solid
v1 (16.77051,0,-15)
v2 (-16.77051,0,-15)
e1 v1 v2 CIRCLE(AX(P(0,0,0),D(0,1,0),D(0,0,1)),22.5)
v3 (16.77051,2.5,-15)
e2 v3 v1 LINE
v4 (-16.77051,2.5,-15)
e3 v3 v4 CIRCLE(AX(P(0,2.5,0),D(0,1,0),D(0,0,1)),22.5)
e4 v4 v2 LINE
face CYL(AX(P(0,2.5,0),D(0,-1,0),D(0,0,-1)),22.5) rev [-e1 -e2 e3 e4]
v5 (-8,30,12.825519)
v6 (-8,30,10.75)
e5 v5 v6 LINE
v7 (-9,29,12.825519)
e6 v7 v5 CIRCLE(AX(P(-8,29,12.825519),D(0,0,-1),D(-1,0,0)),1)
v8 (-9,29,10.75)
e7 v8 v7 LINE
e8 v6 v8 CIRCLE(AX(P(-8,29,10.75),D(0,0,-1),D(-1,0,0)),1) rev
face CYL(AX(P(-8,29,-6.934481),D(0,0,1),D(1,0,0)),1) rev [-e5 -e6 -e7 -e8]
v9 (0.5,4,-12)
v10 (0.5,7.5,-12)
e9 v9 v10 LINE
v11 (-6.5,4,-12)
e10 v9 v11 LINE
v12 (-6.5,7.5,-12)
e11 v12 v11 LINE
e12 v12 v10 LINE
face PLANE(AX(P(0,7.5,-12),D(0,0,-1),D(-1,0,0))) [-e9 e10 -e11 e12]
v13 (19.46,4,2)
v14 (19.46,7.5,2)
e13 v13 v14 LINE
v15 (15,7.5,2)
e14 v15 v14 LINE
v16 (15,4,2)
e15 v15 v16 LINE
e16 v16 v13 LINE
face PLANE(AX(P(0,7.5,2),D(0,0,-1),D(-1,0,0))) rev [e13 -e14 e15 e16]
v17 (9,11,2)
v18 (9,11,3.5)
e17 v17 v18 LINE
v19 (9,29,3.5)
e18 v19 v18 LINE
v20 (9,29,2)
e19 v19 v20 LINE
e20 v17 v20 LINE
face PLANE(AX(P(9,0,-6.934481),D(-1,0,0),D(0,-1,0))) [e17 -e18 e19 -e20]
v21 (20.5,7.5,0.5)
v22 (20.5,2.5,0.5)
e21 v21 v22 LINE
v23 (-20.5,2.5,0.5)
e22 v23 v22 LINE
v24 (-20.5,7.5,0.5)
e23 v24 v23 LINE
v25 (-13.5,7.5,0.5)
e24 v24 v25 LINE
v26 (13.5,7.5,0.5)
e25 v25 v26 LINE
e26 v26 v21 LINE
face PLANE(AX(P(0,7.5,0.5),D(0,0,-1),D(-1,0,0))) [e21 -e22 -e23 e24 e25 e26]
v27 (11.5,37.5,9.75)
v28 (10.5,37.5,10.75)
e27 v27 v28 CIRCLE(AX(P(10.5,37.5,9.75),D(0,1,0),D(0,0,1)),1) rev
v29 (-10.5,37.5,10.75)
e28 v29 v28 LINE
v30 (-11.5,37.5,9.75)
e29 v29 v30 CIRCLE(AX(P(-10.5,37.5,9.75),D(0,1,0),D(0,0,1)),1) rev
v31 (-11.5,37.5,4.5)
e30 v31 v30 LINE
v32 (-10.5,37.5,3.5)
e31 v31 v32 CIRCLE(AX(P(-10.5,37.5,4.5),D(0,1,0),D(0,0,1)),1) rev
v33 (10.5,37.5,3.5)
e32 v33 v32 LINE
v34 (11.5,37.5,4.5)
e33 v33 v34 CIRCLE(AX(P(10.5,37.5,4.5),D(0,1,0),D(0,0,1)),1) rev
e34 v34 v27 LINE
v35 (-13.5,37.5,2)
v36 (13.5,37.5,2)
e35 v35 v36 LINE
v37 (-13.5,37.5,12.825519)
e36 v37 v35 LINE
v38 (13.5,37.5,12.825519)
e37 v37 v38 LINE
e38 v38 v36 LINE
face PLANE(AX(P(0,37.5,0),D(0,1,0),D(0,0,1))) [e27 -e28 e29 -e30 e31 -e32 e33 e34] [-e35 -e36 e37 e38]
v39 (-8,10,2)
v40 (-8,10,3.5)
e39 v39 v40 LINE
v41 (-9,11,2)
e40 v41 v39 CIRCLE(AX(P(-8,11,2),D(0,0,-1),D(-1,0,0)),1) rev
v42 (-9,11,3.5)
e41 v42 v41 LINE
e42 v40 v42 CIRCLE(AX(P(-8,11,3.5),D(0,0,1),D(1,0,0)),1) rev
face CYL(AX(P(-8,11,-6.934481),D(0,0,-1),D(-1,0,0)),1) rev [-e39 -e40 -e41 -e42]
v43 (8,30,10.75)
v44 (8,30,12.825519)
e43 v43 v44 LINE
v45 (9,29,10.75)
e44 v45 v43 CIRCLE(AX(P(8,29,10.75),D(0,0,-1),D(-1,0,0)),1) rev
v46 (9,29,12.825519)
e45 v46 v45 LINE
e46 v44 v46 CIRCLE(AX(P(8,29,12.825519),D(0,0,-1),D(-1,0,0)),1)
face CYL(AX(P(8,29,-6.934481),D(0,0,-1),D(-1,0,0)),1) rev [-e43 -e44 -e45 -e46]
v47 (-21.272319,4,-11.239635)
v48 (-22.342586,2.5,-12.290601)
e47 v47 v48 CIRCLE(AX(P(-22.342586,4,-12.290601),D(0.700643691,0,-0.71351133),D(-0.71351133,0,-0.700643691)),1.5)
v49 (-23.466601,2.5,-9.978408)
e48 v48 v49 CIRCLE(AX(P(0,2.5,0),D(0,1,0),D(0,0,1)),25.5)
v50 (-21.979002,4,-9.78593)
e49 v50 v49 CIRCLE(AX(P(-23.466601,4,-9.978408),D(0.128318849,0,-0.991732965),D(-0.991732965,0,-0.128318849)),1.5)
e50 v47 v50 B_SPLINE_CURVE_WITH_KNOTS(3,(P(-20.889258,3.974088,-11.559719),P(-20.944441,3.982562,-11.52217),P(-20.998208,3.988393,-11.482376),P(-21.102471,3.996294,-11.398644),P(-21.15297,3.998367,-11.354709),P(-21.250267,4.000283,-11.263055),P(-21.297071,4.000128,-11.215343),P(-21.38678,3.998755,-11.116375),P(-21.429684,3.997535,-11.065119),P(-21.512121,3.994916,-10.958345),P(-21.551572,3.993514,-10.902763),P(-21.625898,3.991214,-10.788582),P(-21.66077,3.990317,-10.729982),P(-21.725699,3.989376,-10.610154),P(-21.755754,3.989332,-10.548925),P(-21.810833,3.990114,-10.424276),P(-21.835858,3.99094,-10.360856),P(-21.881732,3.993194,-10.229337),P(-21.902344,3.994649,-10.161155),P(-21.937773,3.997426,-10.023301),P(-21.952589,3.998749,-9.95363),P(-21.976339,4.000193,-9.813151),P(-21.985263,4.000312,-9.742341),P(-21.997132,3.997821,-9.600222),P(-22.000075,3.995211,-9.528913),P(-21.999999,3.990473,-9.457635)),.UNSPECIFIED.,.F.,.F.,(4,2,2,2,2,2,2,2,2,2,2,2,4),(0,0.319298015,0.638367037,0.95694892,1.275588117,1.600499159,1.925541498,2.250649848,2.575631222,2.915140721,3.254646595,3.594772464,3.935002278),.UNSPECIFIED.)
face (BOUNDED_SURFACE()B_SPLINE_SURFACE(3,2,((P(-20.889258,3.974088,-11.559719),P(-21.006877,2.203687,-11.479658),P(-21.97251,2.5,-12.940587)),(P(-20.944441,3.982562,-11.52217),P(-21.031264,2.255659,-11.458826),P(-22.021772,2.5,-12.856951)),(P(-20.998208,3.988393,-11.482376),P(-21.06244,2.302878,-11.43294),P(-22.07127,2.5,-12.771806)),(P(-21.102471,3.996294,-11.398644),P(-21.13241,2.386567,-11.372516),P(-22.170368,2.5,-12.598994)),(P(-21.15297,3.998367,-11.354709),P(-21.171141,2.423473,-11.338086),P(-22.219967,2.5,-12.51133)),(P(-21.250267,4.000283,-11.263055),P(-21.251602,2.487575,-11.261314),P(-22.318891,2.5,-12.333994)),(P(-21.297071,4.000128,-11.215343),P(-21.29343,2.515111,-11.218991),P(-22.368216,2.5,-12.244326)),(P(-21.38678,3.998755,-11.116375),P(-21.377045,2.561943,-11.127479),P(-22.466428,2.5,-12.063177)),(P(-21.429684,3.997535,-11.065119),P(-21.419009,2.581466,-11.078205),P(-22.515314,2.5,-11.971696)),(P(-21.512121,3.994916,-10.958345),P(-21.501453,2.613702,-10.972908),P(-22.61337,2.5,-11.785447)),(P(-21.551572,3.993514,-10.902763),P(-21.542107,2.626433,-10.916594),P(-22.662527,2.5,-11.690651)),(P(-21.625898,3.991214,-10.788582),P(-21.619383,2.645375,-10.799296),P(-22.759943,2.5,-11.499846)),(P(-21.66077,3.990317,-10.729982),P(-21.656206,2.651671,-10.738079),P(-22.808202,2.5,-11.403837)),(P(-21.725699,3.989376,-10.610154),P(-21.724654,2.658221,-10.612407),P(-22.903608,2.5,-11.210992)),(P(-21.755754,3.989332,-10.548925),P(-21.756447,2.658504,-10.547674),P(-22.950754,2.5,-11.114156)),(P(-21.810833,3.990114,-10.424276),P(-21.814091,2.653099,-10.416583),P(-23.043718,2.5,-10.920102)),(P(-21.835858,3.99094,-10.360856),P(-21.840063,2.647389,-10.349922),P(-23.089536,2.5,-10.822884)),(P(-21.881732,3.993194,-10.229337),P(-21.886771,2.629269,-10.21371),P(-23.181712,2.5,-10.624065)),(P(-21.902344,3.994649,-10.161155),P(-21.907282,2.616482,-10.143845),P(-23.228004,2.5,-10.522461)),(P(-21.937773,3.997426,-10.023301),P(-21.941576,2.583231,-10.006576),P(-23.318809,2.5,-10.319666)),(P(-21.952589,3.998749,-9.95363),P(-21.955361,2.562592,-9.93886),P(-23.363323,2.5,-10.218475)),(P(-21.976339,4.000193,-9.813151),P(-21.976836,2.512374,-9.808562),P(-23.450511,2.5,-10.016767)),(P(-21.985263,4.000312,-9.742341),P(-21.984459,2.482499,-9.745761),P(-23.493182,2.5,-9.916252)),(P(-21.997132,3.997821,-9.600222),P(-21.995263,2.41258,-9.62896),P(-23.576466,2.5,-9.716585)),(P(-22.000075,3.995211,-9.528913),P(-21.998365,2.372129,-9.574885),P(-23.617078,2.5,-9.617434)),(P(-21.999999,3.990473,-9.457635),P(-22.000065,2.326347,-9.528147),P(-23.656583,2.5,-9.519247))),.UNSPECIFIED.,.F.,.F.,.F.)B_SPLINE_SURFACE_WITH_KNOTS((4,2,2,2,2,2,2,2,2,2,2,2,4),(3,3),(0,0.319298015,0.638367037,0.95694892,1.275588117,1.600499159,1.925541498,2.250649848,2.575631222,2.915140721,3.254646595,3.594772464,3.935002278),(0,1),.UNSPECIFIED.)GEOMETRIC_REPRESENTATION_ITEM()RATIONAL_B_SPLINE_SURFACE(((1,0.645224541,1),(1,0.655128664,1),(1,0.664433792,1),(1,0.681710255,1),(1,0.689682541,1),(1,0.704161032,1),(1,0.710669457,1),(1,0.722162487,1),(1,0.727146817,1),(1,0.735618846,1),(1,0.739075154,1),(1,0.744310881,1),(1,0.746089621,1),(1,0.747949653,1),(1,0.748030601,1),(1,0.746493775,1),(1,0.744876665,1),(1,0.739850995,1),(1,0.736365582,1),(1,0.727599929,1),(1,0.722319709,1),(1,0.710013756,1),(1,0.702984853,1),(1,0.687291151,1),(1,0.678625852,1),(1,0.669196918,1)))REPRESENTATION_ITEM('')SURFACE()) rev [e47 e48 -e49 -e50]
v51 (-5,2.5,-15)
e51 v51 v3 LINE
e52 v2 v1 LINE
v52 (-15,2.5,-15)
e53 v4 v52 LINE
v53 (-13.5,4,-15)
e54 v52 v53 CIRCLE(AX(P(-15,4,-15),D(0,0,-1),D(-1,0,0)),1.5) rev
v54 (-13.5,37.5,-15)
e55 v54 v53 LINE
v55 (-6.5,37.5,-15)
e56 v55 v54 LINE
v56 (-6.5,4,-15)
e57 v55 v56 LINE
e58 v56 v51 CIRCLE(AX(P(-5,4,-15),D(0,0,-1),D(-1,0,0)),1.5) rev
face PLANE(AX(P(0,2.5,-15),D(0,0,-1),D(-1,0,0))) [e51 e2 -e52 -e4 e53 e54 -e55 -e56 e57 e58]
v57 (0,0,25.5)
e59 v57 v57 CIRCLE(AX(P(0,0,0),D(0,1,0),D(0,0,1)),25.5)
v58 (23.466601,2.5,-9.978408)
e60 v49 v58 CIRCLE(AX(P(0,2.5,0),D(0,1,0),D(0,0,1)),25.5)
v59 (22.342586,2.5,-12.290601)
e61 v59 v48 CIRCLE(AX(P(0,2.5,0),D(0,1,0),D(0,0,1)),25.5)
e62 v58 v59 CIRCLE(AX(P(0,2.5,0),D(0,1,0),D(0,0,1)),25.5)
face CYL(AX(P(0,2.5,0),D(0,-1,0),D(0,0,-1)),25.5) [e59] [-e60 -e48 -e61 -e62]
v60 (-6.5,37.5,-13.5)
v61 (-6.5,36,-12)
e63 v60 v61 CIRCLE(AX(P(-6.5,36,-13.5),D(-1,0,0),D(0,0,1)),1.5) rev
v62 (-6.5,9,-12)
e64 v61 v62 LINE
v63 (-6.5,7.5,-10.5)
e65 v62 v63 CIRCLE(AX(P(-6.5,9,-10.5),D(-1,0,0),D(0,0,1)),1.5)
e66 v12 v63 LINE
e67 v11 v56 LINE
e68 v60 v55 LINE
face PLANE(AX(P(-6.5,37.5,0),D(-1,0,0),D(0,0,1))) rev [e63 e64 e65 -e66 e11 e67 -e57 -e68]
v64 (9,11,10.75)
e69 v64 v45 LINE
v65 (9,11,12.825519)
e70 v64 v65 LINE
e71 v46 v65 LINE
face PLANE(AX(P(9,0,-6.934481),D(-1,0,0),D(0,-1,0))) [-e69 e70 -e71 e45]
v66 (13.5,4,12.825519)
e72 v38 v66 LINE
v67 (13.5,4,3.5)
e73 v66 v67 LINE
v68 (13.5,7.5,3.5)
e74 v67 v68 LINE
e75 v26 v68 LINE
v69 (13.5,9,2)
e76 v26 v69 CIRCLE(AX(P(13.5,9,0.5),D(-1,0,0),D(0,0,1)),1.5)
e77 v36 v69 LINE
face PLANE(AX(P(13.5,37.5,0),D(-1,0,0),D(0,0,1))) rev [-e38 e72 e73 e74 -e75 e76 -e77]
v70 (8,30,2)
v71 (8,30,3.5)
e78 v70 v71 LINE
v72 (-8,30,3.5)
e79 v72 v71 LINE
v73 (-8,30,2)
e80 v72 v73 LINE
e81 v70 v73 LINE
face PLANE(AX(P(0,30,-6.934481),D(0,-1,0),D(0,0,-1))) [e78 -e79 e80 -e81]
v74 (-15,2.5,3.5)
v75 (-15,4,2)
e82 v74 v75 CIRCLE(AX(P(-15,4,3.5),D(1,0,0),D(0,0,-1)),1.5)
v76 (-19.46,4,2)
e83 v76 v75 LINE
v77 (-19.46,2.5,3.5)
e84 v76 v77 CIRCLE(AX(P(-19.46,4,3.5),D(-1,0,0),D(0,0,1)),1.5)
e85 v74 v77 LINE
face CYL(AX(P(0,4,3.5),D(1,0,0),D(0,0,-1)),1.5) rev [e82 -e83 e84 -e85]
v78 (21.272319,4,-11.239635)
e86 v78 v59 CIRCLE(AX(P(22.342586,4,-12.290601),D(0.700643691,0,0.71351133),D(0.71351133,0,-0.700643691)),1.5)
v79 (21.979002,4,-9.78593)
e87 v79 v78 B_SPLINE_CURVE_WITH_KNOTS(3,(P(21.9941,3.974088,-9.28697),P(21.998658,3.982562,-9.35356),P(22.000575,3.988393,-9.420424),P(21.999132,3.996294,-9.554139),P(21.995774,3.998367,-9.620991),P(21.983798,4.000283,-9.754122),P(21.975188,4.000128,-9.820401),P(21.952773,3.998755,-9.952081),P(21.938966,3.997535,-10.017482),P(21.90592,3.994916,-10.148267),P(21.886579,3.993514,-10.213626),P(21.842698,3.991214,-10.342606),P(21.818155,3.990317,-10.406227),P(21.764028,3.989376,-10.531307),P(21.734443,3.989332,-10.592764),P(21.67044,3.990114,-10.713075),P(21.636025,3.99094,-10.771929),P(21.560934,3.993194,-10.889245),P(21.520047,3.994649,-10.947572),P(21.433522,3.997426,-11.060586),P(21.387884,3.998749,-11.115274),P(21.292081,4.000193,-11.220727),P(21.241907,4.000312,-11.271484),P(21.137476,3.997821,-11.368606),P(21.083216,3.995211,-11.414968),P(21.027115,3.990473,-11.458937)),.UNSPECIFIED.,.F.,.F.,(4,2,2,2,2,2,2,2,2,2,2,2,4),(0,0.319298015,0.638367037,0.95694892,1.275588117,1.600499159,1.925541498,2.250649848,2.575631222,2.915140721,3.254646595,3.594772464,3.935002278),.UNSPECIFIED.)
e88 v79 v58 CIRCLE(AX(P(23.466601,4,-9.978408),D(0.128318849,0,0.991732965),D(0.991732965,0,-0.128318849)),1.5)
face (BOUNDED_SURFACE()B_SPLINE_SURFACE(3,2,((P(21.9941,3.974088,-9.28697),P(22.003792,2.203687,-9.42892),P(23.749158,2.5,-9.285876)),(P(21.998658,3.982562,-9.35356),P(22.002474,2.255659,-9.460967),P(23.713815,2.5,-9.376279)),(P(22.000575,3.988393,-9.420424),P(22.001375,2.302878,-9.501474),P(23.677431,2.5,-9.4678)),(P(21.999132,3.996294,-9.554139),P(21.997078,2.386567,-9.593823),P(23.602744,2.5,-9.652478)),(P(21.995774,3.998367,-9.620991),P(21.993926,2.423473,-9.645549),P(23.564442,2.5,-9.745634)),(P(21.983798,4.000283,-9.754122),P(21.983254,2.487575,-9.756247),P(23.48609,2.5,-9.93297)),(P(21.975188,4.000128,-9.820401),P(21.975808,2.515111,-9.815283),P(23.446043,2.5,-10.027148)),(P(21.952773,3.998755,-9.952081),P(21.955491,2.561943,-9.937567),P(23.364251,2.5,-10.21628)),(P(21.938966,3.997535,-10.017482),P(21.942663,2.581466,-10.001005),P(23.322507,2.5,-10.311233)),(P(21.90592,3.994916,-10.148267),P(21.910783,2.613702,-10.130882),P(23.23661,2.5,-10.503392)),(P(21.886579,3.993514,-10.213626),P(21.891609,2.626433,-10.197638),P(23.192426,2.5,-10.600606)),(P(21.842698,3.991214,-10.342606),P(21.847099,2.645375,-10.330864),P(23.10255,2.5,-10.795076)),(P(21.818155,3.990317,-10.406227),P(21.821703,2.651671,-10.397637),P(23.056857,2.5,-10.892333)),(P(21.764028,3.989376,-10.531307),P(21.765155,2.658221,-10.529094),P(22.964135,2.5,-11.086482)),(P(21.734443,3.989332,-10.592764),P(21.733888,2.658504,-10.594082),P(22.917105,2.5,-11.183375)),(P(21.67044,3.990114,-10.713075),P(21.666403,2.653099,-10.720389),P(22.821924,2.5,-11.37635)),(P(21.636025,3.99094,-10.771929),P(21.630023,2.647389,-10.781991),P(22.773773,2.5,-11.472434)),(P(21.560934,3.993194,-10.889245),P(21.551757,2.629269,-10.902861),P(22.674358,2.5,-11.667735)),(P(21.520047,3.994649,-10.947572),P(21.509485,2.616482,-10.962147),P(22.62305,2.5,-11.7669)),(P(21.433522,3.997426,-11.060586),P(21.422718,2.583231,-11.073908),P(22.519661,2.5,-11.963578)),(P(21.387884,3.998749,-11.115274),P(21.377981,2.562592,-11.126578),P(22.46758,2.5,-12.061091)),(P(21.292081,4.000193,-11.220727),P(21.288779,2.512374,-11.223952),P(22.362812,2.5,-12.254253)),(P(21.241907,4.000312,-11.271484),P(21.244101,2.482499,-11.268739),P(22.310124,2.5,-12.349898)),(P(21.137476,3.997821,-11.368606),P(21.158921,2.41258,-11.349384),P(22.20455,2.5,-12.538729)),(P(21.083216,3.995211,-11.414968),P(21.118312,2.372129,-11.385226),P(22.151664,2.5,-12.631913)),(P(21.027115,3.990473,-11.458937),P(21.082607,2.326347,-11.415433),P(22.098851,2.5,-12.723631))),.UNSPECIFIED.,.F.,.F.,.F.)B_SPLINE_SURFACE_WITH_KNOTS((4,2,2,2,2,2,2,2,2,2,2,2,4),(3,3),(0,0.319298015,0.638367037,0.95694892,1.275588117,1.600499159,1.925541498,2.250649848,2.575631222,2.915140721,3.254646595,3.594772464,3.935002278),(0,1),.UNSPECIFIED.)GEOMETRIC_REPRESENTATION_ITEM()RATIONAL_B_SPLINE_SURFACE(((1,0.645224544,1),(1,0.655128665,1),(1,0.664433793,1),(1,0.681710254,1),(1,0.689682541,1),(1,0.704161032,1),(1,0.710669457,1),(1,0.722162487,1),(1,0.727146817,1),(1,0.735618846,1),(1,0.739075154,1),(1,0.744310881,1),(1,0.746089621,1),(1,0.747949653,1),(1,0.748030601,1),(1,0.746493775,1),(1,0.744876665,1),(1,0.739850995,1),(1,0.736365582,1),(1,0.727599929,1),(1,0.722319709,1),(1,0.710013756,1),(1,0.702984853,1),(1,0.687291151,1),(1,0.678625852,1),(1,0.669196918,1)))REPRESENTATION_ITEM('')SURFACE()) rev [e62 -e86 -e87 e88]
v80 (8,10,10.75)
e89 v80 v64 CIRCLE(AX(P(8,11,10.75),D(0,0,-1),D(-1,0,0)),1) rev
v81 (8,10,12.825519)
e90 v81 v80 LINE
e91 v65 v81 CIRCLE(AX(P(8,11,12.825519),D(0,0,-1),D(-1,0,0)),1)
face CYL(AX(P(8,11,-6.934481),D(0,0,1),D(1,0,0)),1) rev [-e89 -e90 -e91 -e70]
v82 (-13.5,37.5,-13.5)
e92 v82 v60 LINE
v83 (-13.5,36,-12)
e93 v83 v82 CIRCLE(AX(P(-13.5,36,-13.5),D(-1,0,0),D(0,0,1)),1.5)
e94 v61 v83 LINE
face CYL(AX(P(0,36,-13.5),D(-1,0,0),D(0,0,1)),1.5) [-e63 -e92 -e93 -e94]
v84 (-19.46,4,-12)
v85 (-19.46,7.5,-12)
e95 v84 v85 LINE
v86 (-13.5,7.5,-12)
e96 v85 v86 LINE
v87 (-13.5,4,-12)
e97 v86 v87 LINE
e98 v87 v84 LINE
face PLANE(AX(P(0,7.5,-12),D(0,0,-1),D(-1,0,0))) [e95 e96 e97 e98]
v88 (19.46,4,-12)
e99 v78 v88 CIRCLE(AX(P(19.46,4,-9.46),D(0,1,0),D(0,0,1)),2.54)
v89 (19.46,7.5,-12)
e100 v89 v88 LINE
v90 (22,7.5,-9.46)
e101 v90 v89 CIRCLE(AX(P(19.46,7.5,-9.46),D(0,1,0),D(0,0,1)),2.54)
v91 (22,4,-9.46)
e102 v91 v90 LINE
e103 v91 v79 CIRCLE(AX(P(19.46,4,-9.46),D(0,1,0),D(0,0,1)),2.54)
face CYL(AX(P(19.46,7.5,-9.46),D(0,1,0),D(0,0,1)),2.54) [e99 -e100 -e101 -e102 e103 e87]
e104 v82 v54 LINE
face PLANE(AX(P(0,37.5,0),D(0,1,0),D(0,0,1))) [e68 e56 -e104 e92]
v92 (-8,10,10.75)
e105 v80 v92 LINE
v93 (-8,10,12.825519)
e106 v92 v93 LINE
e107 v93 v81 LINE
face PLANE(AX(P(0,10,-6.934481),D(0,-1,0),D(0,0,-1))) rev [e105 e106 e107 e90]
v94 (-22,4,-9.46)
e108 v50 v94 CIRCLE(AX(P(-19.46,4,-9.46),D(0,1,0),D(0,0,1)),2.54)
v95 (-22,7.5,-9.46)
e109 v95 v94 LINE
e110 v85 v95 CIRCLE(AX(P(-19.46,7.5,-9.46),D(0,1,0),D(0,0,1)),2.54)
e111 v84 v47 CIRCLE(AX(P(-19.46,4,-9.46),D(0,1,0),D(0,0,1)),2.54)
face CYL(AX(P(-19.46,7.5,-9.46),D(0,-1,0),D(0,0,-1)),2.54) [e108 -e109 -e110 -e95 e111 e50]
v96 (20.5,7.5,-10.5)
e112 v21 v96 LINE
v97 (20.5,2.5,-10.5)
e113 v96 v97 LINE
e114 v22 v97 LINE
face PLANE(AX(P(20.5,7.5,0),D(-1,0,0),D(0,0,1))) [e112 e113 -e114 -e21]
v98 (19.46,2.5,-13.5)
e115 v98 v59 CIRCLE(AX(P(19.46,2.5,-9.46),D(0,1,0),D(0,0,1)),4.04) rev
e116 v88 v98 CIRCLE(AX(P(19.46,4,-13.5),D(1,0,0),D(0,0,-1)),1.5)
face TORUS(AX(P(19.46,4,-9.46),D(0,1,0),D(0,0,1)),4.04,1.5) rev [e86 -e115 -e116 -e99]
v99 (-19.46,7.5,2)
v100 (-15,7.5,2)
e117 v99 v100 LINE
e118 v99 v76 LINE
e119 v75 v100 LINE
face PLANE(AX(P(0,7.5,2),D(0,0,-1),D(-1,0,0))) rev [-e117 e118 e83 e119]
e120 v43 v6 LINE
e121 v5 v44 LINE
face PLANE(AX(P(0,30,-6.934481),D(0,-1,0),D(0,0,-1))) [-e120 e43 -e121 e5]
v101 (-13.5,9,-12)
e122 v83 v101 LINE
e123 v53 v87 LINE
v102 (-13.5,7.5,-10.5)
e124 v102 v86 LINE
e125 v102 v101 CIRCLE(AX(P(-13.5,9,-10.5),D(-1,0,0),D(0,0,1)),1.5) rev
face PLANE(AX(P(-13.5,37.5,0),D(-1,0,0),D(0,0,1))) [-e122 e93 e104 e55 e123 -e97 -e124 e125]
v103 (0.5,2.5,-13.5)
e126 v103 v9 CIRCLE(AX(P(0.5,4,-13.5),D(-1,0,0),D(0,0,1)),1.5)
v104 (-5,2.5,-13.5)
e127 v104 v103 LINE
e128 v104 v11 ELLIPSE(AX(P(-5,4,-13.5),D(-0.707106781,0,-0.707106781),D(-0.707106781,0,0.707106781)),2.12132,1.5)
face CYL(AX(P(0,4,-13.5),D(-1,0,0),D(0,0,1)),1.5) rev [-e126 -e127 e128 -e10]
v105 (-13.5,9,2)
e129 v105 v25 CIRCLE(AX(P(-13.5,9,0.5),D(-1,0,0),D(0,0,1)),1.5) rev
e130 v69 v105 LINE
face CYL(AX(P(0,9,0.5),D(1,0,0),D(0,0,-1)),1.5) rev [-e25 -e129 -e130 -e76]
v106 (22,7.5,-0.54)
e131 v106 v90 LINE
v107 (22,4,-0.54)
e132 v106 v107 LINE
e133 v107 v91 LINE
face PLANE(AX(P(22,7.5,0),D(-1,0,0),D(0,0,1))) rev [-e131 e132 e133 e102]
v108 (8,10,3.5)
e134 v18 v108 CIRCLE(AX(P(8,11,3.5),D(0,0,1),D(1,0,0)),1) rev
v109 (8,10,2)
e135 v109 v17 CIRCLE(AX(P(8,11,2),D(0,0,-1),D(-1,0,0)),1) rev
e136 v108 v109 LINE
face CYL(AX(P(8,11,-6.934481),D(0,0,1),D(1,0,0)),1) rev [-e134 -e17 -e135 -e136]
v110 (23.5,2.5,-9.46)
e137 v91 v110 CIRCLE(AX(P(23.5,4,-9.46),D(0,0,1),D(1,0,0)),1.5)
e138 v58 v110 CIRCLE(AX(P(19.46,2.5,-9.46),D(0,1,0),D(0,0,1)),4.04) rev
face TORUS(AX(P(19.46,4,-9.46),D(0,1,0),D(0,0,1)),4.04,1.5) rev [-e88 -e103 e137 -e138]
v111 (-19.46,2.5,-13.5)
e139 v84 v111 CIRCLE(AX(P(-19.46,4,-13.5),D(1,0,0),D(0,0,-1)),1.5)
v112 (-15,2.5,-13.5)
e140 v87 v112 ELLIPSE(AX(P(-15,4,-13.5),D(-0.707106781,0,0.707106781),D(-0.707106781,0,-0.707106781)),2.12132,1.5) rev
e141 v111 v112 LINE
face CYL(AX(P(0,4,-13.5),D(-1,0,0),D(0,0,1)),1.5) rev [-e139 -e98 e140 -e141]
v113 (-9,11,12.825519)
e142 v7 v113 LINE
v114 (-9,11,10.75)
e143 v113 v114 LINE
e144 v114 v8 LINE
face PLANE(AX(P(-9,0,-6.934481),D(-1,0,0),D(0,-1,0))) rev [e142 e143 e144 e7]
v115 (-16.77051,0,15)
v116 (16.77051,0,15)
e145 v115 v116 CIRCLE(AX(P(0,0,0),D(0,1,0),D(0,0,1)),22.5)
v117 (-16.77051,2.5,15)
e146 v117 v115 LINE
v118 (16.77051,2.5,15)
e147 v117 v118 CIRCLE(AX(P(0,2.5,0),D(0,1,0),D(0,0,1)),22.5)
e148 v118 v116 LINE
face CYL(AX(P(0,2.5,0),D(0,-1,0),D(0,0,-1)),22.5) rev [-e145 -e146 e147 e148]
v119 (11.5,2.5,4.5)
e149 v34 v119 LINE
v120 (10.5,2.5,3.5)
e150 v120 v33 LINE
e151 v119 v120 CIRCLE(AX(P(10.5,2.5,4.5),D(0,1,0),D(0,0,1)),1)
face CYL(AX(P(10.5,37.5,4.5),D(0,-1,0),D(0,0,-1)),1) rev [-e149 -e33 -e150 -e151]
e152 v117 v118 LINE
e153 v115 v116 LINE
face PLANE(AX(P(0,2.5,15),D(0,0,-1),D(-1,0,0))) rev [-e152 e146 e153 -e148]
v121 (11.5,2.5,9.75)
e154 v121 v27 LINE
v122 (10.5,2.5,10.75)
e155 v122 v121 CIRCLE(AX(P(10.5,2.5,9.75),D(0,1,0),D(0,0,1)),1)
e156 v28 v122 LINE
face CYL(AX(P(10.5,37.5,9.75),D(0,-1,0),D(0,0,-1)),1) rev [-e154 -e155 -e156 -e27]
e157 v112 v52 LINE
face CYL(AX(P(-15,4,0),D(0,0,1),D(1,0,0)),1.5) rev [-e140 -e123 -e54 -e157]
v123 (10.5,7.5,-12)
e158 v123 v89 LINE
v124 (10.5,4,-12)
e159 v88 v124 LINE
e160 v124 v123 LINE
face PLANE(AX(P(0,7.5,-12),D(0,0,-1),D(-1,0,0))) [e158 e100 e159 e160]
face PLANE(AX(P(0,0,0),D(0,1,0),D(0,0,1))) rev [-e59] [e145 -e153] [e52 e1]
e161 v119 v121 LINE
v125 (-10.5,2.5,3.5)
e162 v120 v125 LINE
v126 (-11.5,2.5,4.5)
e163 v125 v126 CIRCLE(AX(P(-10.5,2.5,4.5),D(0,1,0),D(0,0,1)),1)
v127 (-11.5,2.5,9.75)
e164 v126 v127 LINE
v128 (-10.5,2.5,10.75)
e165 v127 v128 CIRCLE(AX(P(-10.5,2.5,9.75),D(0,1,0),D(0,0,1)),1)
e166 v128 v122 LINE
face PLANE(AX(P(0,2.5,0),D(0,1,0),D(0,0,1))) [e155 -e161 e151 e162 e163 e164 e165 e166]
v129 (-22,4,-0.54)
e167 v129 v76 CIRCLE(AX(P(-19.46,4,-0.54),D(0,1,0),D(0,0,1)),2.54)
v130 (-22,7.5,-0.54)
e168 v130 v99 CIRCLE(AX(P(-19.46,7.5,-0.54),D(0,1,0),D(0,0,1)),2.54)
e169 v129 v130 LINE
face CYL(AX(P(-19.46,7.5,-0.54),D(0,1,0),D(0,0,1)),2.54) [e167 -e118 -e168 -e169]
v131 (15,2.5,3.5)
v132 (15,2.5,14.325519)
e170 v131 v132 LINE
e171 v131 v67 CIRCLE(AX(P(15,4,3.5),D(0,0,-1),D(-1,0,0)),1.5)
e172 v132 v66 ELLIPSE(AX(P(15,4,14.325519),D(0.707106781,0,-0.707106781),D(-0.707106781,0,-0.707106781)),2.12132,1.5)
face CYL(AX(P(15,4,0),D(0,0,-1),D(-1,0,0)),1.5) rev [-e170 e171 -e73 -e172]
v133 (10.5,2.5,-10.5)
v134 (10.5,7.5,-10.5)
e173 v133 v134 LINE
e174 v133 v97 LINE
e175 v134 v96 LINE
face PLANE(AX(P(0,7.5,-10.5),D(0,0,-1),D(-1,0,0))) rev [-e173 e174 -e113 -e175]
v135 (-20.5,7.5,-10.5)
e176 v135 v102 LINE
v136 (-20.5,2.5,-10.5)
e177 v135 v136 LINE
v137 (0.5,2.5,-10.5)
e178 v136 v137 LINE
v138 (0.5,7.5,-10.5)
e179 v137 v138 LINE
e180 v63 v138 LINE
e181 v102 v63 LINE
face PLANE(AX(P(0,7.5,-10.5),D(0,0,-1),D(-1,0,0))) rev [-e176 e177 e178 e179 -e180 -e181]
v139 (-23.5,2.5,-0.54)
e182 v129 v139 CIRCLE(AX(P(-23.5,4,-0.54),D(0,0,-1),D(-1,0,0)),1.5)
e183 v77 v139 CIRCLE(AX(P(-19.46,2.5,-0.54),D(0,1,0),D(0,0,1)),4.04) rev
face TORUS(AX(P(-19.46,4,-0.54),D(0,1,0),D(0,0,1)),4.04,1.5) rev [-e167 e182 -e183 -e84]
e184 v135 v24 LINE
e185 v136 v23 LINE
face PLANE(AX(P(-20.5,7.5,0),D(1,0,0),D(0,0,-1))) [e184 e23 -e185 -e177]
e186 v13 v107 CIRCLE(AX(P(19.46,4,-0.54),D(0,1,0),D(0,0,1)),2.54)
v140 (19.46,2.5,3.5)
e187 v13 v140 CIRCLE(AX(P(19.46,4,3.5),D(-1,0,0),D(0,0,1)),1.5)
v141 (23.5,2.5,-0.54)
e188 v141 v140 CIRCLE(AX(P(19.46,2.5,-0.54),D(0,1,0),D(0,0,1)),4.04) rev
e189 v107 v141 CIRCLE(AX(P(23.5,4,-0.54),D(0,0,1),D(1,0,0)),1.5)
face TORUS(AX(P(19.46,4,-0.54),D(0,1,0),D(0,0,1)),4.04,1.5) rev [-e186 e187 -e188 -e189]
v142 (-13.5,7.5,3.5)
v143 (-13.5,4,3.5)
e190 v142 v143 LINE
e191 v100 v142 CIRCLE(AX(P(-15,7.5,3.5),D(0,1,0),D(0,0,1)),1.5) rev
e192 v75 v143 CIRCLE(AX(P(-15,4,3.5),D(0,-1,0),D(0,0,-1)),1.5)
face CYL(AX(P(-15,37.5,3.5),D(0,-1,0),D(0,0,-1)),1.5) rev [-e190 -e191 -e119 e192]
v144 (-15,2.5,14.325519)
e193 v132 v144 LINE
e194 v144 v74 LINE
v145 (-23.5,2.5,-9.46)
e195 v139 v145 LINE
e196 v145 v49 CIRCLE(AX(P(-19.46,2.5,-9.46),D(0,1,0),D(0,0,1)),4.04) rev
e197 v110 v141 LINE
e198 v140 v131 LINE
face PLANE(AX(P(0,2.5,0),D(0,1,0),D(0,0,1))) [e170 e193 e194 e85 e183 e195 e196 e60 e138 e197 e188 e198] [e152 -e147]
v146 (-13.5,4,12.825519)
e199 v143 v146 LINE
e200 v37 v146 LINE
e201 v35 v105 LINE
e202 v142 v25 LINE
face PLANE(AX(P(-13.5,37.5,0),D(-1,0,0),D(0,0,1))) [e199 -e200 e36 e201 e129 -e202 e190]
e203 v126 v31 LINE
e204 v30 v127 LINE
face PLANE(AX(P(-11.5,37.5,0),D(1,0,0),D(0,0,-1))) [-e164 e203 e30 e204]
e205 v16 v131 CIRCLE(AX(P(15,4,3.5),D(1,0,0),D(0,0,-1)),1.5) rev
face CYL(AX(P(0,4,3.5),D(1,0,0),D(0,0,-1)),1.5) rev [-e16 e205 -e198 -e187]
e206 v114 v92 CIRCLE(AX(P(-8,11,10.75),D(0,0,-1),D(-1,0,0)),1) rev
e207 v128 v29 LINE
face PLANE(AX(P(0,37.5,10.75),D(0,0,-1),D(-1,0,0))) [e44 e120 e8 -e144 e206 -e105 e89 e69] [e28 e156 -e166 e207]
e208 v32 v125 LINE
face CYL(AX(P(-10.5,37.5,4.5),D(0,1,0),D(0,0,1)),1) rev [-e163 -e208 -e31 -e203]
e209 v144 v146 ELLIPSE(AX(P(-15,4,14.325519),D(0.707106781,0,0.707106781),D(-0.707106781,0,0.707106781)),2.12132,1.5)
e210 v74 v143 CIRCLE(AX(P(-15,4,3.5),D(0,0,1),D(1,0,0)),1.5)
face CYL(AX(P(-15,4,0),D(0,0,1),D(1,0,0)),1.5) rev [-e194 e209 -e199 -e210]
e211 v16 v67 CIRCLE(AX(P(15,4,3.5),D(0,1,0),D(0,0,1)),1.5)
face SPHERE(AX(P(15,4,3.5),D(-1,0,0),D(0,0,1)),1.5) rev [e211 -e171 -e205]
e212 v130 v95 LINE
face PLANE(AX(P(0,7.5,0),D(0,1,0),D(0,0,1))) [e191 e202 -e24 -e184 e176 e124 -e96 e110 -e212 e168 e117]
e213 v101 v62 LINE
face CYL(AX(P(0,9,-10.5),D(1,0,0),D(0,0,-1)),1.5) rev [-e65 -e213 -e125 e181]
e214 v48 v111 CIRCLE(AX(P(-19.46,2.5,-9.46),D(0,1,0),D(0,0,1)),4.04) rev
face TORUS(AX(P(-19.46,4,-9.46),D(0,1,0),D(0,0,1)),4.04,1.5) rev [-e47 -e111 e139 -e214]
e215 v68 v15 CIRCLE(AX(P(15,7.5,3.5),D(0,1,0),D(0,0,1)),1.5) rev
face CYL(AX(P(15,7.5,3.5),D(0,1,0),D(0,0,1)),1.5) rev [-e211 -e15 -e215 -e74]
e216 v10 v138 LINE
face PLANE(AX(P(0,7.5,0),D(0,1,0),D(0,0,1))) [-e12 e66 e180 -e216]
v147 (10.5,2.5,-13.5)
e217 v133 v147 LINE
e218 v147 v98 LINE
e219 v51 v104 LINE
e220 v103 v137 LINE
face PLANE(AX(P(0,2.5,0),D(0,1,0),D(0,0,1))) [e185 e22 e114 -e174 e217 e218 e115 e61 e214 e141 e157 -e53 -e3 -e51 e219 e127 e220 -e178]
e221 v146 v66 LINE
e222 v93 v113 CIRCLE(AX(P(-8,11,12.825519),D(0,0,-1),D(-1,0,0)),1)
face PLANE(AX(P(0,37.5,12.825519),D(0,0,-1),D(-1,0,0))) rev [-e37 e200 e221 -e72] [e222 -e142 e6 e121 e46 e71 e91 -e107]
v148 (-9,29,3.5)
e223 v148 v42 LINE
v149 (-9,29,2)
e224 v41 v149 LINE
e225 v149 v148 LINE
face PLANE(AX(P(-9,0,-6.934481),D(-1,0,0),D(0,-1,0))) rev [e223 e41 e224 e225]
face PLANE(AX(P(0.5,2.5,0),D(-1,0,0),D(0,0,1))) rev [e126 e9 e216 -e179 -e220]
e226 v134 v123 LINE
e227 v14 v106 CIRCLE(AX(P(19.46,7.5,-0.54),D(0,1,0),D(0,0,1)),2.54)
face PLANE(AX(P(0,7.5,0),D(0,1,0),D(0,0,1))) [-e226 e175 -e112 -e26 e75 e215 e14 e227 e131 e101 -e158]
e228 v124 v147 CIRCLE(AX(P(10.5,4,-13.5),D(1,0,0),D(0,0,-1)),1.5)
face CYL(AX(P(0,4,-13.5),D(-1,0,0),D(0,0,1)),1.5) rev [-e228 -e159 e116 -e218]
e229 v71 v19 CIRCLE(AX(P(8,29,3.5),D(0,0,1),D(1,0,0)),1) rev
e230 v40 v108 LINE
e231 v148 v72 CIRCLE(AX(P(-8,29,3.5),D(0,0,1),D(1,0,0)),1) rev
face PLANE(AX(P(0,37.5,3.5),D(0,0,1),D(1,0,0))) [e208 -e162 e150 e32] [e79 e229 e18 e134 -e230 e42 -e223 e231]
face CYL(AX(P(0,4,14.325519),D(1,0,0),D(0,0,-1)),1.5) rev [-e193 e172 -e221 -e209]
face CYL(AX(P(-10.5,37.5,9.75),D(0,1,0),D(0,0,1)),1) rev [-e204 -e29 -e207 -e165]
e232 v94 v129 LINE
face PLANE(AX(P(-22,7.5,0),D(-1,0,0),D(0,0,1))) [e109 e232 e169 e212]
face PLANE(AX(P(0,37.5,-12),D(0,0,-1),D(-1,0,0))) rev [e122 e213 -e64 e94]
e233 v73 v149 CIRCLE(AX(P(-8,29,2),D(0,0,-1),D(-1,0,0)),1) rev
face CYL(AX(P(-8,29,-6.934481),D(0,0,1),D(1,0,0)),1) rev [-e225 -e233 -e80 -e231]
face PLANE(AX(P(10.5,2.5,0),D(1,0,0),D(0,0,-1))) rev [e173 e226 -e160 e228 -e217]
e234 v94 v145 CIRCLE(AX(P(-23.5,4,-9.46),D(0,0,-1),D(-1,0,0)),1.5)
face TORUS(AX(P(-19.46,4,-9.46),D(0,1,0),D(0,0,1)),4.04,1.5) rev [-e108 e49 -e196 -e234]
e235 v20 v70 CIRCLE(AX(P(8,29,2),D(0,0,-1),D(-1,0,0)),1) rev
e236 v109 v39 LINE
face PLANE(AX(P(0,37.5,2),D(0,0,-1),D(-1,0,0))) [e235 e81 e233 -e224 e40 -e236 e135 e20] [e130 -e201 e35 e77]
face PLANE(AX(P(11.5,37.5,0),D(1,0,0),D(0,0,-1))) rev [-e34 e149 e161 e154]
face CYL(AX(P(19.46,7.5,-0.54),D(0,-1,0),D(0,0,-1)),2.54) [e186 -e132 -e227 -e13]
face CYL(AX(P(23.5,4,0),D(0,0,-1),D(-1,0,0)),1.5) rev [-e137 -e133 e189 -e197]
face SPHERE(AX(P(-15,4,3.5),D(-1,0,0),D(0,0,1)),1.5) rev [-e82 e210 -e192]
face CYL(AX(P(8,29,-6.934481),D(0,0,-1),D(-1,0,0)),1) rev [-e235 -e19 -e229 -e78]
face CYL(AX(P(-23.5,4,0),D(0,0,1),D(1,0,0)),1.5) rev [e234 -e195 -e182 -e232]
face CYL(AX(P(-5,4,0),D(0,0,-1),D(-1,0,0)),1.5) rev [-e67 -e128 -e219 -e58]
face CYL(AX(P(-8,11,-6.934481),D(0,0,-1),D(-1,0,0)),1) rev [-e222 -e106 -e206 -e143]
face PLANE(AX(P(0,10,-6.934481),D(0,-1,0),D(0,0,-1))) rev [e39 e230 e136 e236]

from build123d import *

# Parameters (mm, degrees)
SKETCH1_R           = 25.5
SKETCH1_R_2         = 22.5
SKETCH1_W           = 33.541019662
SKETCH1_H           = 30
BOSS_EXTRUDE1_DEPTH = 2.5
SKETCH2_W           = 1.5
SKETCH2_H           = 1.5
SKETCH2_W_2         = 41
BOSS_EXTRUDE2_DEPTH = 5
FILLET1_R           = 2.54
SKETCH3_W           = 10
SKETCH3_H           = 1.5
CUT_EXTRUDE1_DEPTH  = 5
SKETCH4_W           = 7
SKETCH4_H           = 3
BOSS_EXTRUDE3_DEPTH = 35
FILLET2_R           = 1.5
FILLET3_R           = 1.5
SKETCH5_W           = 11.5
SKETCH5_H           = 0.25
SKETCH5_H_2         = 1.25
SKETCH5_W_2         = 2
SKETCH5_H_3         = 7.25
BOSS_EXTRUDE5_DEPTH = 35
FILLET4_R           = 1.5
FILLET5_R           = 1.5
FILLET6_R           = 1
SKETCH6_W           = 9
SKETCH6_H           = 10
CUT_EXTRUDE3_DEPTH  = 19.76
FILLET7_R           = 1


with BuildPart() as part:
    # Sketch1 → Boss-Extrude1 (new body)
    # profile 1 of 4: a face of its own
    with BuildSketch(Plane(origin=(0, 0, 0), x_dir=(1, 0, 0), z_dir=(0, 1, 0))):
        with Locations(Location((0, 0, 0), (0, 0, 270))):
            Circle(SKETCH1_R)
        Circle(SKETCH1_R_2, mode=Mode.SUBTRACT)
    # profile 2 of 4: a face of its own
    with BuildSketch(Plane(origin=(0, 0, 0), x_dir=(1, 0, 0), z_dir=(0, 1, 0))):
        Rectangle(SKETCH1_W, SKETCH1_H)
    # profile 3 of 4: a face of its own
    with BuildSketch(Plane(origin=(0, 0, 0), x_dir=(1, 0, 0), z_dir=(0, 1, 0))):
        with BuildLine():
            ThreePointArc((22.5, 0), (21.018878077, 8.02849702), (16.770509831, 15))
            Line((16.770509831, 15), (16.770509831, -15))
            ThreePointArc((16.770509831, -15), (21.018878077, -8.02849702), (22.5, 0))
        make_face()
    # profile 4 of 4: a face of its own
    with BuildSketch(Plane(origin=(0, 0, 0), x_dir=(1, 0, 0), z_dir=(0, 1, 0))):
        with BuildLine():
            Line((-16.770509831, -15), (-16.770509831, 15))
            ThreePointArc((-16.770509831, 15), (-22.5, 0), (-16.770509831, -15))
        make_face()
    extrude(amount=BOSS_EXTRUDE1_DEPTH)

    # Sketch2 → Boss-Extrude2 (add)
    with BuildSketch(Plane(origin=(0, 2.5, 0), x_dir=(1, 0, 0), z_dir=(0, 1, 0))):
        Polygon((-20.5, -0.5), (-20.5, 5.5), (-20.5, 10.5), (-22, 10.5), (-22, -0.5), align=None)
        with Locations((-21.25, -1.25)):
            Rectangle(SKETCH2_W, SKETCH2_H)
        with Locations((0, -1.25)):
            Rectangle(SKETCH2_W_2, SKETCH2_H)
        Polygon((20.5, 10.5), (20.5, 5.5), (20.5, -0.5), (20.5, -2), (22, -2), (22, 12), (20.5, 12), align=None)
        Polygon((-20.5, 10.5), (20.5, 10.5), (20.5, 12), (-22, 12), (-22, 10.5), align=None)
    extrude(amount=BOSS_EXTRUDE2_DEPTH)

    # Fillet1
    fillet1_edges = [part.edges().sort_by_distance(p)[0] for p in [
        (-22, 5, -12),
        (-22, 5, 2),
        (22, 5, 2),
        (22, 5, -12),
    ]]
    fillet(fillet1_edges, radius=FILLET1_R)

    # Sketch3 → Cut-Extrude1 (cut)
    with BuildSketch(Plane(origin=(0, 7.5, 0), x_dir=(1, 0, 0), z_dir=(0, 1, 0))):
        with Locations((5.5, 11.25)):
            Rectangle(SKETCH3_W, SKETCH3_H)
    extrude(amount=-CUT_EXTRUDE1_DEPTH, mode=Mode.SUBTRACT)

    # Sketch4 → Boss-Extrude3 (add)
    with BuildSketch(Plane(origin=(0, 2.5, 0), x_dir=(1, 0, 0), z_dir=(0, 1, 0))):
        with Locations((-10, 13.5)):
            Rectangle(SKETCH4_W, SKETCH4_H)
    extrude(amount=BOSS_EXTRUDE3_DEPTH)

    # Fillet2
    fillet2_edges = [part.edges().sort_by_distance(p)[0] for p in [
        (-10, 7.5, -12),
        (-3, 2.5, -12),
        (-6.5, 2.5, -13.5),
        (-13.5, 2.5, -13.5),
        (0, 2.5, 2),
        (-22, 2.5, -5),
        (22, 2.5, -5),
        (-16.48, 2.5, -12),
        (-21.256051224, 2.5, 1.256051224),
        (21.256051224, 2.5, 1.256051224),
        (21.256051224, 2.5, -11.256051224),
        (-21.256051224, 2.5, -11.256051224),
        (14.98, 2.5, -12),
    ]]
    fillet(fillet2_edges, radius=FILLET2_R - 0.0001)  # a hair under: the kernel refuses the full size

    # Fillet3
    fillet3_edges = [part.edges().sort_by_distance(p)[0] for p in [
        (-10, 37.5, -12),
    ]]
    fillet(fillet3_edges, radius=FILLET3_R)

    # Sketch5 → Boss-Extrude5 (add)
    with BuildSketch(Plane(origin=(0, 2.5, 0), x_dir=(1, 0, 0), z_dir=(0, 1, 0))):
        with Locations((-5.75, -2.125)):
            Rectangle(SKETCH5_W, SKETCH5_H)
        with Locations((-5.75, -2.875)):
            Rectangle(SKETCH5_W, SKETCH5_H_2)
        with Locations((5.75, -2.875)):
            Rectangle(SKETCH5_W, SKETCH5_H_2)
        with Locations((5.75, -2.125)):
            Rectangle(SKETCH5_W, SKETCH5_H)
        Polygon((13.5, -2), (11.5, -2), (11.5, -2.25), (11.5, -3.5), (13.5, -3.5), align=None)
        with Locations((12.5, -7.125)):
            Rectangle(SKETCH5_W_2, SKETCH5_H_3)
        Polygon((11.5, -10.75), (-11.5, -10.75), (-13.5, -10.75), (-13.5, -12.825519341), (13.5, -12.825519341), (13.5, -10.75), align=None)
        with Locations((-12.5, -7.125)):
            Rectangle(SKETCH5_W_2, SKETCH5_H_3)
        Polygon((-11.5, -2.25), (-11.5, -2), (-13.5, -2), (-13.5, -3.5), (-11.5, -3.5), align=None)
    extrude(amount=BOSS_EXTRUDE5_DEPTH)

    # Fillet4
    fillet4_edges = [part.edges().sort_by_distance(p)[0] for p in [
        (0, 7.5, 2),
    ]]
    fillet(fillet4_edges, radius=FILLET4_R - 0.0001)  # a hair under: the kernel refuses the full size

    # Fillet5
    fillet5_edges = [part.edges().sort_by_distance(p)[0] for p in [
        (-13.5, 2.939310539, 2.439310539),
        (13.5, 2.939310539, 2.439310539),
        (13.5, 2.5, 8.16270967),
        (13.5, 5.74995, 2),
        (-13.5, 5.74995, 2),
        (0, 2.5, 12.825519341),
        (-13.5, 2.5, 8.16270967),
    ]]
    fillet(fillet5_edges, radius=FILLET5_R - 0.0001)  # a hair under: the kernel refuses the full size

    # Fillet6
    fillet6_edges = [part.edges().sort_by_distance(p)[0] for p in [
        (11.5, 20, 3.5),
        (11.5, 20, 10.75),
        (-11.5, 20, 10.75),
        (-11.5, 20, 3.5),
    ]]
    fillet(fillet6_edges, radius=FILLET6_R)

    # Sketch6 → Cut-Extrude3 (cut)
    with BuildSketch(Plane.XY.offset(12.825519341)):
        with Locations((-4.5, 25)):
            Rectangle(SKETCH6_W, SKETCH6_H)
        Polygon((9, 30), (0, 30), (0, 20), (-9, 20), (-9, 10), (9, 10), align=None)
    extrude(amount=-CUT_EXTRUDE3_DEPTH, mode=Mode.SUBTRACT)

    # Fillet7
    fillet7_edges = [part.edges().sort_by_distance(p)[0] for p in [
        (-9, 30, 11.78775967),
        (9, 30, 11.78775967),
        (9, 10, 11.78775967),
        (-9, 10, 11.78775967),
        (-9, 30, 2.75),
        (9, 30, 2.75),
        (9, 10, 2.75),
        (-9, 10, 2.75),
    ]]
    fillet(fillet7_edges, radius=FILLET7_R)


solid = part.part
